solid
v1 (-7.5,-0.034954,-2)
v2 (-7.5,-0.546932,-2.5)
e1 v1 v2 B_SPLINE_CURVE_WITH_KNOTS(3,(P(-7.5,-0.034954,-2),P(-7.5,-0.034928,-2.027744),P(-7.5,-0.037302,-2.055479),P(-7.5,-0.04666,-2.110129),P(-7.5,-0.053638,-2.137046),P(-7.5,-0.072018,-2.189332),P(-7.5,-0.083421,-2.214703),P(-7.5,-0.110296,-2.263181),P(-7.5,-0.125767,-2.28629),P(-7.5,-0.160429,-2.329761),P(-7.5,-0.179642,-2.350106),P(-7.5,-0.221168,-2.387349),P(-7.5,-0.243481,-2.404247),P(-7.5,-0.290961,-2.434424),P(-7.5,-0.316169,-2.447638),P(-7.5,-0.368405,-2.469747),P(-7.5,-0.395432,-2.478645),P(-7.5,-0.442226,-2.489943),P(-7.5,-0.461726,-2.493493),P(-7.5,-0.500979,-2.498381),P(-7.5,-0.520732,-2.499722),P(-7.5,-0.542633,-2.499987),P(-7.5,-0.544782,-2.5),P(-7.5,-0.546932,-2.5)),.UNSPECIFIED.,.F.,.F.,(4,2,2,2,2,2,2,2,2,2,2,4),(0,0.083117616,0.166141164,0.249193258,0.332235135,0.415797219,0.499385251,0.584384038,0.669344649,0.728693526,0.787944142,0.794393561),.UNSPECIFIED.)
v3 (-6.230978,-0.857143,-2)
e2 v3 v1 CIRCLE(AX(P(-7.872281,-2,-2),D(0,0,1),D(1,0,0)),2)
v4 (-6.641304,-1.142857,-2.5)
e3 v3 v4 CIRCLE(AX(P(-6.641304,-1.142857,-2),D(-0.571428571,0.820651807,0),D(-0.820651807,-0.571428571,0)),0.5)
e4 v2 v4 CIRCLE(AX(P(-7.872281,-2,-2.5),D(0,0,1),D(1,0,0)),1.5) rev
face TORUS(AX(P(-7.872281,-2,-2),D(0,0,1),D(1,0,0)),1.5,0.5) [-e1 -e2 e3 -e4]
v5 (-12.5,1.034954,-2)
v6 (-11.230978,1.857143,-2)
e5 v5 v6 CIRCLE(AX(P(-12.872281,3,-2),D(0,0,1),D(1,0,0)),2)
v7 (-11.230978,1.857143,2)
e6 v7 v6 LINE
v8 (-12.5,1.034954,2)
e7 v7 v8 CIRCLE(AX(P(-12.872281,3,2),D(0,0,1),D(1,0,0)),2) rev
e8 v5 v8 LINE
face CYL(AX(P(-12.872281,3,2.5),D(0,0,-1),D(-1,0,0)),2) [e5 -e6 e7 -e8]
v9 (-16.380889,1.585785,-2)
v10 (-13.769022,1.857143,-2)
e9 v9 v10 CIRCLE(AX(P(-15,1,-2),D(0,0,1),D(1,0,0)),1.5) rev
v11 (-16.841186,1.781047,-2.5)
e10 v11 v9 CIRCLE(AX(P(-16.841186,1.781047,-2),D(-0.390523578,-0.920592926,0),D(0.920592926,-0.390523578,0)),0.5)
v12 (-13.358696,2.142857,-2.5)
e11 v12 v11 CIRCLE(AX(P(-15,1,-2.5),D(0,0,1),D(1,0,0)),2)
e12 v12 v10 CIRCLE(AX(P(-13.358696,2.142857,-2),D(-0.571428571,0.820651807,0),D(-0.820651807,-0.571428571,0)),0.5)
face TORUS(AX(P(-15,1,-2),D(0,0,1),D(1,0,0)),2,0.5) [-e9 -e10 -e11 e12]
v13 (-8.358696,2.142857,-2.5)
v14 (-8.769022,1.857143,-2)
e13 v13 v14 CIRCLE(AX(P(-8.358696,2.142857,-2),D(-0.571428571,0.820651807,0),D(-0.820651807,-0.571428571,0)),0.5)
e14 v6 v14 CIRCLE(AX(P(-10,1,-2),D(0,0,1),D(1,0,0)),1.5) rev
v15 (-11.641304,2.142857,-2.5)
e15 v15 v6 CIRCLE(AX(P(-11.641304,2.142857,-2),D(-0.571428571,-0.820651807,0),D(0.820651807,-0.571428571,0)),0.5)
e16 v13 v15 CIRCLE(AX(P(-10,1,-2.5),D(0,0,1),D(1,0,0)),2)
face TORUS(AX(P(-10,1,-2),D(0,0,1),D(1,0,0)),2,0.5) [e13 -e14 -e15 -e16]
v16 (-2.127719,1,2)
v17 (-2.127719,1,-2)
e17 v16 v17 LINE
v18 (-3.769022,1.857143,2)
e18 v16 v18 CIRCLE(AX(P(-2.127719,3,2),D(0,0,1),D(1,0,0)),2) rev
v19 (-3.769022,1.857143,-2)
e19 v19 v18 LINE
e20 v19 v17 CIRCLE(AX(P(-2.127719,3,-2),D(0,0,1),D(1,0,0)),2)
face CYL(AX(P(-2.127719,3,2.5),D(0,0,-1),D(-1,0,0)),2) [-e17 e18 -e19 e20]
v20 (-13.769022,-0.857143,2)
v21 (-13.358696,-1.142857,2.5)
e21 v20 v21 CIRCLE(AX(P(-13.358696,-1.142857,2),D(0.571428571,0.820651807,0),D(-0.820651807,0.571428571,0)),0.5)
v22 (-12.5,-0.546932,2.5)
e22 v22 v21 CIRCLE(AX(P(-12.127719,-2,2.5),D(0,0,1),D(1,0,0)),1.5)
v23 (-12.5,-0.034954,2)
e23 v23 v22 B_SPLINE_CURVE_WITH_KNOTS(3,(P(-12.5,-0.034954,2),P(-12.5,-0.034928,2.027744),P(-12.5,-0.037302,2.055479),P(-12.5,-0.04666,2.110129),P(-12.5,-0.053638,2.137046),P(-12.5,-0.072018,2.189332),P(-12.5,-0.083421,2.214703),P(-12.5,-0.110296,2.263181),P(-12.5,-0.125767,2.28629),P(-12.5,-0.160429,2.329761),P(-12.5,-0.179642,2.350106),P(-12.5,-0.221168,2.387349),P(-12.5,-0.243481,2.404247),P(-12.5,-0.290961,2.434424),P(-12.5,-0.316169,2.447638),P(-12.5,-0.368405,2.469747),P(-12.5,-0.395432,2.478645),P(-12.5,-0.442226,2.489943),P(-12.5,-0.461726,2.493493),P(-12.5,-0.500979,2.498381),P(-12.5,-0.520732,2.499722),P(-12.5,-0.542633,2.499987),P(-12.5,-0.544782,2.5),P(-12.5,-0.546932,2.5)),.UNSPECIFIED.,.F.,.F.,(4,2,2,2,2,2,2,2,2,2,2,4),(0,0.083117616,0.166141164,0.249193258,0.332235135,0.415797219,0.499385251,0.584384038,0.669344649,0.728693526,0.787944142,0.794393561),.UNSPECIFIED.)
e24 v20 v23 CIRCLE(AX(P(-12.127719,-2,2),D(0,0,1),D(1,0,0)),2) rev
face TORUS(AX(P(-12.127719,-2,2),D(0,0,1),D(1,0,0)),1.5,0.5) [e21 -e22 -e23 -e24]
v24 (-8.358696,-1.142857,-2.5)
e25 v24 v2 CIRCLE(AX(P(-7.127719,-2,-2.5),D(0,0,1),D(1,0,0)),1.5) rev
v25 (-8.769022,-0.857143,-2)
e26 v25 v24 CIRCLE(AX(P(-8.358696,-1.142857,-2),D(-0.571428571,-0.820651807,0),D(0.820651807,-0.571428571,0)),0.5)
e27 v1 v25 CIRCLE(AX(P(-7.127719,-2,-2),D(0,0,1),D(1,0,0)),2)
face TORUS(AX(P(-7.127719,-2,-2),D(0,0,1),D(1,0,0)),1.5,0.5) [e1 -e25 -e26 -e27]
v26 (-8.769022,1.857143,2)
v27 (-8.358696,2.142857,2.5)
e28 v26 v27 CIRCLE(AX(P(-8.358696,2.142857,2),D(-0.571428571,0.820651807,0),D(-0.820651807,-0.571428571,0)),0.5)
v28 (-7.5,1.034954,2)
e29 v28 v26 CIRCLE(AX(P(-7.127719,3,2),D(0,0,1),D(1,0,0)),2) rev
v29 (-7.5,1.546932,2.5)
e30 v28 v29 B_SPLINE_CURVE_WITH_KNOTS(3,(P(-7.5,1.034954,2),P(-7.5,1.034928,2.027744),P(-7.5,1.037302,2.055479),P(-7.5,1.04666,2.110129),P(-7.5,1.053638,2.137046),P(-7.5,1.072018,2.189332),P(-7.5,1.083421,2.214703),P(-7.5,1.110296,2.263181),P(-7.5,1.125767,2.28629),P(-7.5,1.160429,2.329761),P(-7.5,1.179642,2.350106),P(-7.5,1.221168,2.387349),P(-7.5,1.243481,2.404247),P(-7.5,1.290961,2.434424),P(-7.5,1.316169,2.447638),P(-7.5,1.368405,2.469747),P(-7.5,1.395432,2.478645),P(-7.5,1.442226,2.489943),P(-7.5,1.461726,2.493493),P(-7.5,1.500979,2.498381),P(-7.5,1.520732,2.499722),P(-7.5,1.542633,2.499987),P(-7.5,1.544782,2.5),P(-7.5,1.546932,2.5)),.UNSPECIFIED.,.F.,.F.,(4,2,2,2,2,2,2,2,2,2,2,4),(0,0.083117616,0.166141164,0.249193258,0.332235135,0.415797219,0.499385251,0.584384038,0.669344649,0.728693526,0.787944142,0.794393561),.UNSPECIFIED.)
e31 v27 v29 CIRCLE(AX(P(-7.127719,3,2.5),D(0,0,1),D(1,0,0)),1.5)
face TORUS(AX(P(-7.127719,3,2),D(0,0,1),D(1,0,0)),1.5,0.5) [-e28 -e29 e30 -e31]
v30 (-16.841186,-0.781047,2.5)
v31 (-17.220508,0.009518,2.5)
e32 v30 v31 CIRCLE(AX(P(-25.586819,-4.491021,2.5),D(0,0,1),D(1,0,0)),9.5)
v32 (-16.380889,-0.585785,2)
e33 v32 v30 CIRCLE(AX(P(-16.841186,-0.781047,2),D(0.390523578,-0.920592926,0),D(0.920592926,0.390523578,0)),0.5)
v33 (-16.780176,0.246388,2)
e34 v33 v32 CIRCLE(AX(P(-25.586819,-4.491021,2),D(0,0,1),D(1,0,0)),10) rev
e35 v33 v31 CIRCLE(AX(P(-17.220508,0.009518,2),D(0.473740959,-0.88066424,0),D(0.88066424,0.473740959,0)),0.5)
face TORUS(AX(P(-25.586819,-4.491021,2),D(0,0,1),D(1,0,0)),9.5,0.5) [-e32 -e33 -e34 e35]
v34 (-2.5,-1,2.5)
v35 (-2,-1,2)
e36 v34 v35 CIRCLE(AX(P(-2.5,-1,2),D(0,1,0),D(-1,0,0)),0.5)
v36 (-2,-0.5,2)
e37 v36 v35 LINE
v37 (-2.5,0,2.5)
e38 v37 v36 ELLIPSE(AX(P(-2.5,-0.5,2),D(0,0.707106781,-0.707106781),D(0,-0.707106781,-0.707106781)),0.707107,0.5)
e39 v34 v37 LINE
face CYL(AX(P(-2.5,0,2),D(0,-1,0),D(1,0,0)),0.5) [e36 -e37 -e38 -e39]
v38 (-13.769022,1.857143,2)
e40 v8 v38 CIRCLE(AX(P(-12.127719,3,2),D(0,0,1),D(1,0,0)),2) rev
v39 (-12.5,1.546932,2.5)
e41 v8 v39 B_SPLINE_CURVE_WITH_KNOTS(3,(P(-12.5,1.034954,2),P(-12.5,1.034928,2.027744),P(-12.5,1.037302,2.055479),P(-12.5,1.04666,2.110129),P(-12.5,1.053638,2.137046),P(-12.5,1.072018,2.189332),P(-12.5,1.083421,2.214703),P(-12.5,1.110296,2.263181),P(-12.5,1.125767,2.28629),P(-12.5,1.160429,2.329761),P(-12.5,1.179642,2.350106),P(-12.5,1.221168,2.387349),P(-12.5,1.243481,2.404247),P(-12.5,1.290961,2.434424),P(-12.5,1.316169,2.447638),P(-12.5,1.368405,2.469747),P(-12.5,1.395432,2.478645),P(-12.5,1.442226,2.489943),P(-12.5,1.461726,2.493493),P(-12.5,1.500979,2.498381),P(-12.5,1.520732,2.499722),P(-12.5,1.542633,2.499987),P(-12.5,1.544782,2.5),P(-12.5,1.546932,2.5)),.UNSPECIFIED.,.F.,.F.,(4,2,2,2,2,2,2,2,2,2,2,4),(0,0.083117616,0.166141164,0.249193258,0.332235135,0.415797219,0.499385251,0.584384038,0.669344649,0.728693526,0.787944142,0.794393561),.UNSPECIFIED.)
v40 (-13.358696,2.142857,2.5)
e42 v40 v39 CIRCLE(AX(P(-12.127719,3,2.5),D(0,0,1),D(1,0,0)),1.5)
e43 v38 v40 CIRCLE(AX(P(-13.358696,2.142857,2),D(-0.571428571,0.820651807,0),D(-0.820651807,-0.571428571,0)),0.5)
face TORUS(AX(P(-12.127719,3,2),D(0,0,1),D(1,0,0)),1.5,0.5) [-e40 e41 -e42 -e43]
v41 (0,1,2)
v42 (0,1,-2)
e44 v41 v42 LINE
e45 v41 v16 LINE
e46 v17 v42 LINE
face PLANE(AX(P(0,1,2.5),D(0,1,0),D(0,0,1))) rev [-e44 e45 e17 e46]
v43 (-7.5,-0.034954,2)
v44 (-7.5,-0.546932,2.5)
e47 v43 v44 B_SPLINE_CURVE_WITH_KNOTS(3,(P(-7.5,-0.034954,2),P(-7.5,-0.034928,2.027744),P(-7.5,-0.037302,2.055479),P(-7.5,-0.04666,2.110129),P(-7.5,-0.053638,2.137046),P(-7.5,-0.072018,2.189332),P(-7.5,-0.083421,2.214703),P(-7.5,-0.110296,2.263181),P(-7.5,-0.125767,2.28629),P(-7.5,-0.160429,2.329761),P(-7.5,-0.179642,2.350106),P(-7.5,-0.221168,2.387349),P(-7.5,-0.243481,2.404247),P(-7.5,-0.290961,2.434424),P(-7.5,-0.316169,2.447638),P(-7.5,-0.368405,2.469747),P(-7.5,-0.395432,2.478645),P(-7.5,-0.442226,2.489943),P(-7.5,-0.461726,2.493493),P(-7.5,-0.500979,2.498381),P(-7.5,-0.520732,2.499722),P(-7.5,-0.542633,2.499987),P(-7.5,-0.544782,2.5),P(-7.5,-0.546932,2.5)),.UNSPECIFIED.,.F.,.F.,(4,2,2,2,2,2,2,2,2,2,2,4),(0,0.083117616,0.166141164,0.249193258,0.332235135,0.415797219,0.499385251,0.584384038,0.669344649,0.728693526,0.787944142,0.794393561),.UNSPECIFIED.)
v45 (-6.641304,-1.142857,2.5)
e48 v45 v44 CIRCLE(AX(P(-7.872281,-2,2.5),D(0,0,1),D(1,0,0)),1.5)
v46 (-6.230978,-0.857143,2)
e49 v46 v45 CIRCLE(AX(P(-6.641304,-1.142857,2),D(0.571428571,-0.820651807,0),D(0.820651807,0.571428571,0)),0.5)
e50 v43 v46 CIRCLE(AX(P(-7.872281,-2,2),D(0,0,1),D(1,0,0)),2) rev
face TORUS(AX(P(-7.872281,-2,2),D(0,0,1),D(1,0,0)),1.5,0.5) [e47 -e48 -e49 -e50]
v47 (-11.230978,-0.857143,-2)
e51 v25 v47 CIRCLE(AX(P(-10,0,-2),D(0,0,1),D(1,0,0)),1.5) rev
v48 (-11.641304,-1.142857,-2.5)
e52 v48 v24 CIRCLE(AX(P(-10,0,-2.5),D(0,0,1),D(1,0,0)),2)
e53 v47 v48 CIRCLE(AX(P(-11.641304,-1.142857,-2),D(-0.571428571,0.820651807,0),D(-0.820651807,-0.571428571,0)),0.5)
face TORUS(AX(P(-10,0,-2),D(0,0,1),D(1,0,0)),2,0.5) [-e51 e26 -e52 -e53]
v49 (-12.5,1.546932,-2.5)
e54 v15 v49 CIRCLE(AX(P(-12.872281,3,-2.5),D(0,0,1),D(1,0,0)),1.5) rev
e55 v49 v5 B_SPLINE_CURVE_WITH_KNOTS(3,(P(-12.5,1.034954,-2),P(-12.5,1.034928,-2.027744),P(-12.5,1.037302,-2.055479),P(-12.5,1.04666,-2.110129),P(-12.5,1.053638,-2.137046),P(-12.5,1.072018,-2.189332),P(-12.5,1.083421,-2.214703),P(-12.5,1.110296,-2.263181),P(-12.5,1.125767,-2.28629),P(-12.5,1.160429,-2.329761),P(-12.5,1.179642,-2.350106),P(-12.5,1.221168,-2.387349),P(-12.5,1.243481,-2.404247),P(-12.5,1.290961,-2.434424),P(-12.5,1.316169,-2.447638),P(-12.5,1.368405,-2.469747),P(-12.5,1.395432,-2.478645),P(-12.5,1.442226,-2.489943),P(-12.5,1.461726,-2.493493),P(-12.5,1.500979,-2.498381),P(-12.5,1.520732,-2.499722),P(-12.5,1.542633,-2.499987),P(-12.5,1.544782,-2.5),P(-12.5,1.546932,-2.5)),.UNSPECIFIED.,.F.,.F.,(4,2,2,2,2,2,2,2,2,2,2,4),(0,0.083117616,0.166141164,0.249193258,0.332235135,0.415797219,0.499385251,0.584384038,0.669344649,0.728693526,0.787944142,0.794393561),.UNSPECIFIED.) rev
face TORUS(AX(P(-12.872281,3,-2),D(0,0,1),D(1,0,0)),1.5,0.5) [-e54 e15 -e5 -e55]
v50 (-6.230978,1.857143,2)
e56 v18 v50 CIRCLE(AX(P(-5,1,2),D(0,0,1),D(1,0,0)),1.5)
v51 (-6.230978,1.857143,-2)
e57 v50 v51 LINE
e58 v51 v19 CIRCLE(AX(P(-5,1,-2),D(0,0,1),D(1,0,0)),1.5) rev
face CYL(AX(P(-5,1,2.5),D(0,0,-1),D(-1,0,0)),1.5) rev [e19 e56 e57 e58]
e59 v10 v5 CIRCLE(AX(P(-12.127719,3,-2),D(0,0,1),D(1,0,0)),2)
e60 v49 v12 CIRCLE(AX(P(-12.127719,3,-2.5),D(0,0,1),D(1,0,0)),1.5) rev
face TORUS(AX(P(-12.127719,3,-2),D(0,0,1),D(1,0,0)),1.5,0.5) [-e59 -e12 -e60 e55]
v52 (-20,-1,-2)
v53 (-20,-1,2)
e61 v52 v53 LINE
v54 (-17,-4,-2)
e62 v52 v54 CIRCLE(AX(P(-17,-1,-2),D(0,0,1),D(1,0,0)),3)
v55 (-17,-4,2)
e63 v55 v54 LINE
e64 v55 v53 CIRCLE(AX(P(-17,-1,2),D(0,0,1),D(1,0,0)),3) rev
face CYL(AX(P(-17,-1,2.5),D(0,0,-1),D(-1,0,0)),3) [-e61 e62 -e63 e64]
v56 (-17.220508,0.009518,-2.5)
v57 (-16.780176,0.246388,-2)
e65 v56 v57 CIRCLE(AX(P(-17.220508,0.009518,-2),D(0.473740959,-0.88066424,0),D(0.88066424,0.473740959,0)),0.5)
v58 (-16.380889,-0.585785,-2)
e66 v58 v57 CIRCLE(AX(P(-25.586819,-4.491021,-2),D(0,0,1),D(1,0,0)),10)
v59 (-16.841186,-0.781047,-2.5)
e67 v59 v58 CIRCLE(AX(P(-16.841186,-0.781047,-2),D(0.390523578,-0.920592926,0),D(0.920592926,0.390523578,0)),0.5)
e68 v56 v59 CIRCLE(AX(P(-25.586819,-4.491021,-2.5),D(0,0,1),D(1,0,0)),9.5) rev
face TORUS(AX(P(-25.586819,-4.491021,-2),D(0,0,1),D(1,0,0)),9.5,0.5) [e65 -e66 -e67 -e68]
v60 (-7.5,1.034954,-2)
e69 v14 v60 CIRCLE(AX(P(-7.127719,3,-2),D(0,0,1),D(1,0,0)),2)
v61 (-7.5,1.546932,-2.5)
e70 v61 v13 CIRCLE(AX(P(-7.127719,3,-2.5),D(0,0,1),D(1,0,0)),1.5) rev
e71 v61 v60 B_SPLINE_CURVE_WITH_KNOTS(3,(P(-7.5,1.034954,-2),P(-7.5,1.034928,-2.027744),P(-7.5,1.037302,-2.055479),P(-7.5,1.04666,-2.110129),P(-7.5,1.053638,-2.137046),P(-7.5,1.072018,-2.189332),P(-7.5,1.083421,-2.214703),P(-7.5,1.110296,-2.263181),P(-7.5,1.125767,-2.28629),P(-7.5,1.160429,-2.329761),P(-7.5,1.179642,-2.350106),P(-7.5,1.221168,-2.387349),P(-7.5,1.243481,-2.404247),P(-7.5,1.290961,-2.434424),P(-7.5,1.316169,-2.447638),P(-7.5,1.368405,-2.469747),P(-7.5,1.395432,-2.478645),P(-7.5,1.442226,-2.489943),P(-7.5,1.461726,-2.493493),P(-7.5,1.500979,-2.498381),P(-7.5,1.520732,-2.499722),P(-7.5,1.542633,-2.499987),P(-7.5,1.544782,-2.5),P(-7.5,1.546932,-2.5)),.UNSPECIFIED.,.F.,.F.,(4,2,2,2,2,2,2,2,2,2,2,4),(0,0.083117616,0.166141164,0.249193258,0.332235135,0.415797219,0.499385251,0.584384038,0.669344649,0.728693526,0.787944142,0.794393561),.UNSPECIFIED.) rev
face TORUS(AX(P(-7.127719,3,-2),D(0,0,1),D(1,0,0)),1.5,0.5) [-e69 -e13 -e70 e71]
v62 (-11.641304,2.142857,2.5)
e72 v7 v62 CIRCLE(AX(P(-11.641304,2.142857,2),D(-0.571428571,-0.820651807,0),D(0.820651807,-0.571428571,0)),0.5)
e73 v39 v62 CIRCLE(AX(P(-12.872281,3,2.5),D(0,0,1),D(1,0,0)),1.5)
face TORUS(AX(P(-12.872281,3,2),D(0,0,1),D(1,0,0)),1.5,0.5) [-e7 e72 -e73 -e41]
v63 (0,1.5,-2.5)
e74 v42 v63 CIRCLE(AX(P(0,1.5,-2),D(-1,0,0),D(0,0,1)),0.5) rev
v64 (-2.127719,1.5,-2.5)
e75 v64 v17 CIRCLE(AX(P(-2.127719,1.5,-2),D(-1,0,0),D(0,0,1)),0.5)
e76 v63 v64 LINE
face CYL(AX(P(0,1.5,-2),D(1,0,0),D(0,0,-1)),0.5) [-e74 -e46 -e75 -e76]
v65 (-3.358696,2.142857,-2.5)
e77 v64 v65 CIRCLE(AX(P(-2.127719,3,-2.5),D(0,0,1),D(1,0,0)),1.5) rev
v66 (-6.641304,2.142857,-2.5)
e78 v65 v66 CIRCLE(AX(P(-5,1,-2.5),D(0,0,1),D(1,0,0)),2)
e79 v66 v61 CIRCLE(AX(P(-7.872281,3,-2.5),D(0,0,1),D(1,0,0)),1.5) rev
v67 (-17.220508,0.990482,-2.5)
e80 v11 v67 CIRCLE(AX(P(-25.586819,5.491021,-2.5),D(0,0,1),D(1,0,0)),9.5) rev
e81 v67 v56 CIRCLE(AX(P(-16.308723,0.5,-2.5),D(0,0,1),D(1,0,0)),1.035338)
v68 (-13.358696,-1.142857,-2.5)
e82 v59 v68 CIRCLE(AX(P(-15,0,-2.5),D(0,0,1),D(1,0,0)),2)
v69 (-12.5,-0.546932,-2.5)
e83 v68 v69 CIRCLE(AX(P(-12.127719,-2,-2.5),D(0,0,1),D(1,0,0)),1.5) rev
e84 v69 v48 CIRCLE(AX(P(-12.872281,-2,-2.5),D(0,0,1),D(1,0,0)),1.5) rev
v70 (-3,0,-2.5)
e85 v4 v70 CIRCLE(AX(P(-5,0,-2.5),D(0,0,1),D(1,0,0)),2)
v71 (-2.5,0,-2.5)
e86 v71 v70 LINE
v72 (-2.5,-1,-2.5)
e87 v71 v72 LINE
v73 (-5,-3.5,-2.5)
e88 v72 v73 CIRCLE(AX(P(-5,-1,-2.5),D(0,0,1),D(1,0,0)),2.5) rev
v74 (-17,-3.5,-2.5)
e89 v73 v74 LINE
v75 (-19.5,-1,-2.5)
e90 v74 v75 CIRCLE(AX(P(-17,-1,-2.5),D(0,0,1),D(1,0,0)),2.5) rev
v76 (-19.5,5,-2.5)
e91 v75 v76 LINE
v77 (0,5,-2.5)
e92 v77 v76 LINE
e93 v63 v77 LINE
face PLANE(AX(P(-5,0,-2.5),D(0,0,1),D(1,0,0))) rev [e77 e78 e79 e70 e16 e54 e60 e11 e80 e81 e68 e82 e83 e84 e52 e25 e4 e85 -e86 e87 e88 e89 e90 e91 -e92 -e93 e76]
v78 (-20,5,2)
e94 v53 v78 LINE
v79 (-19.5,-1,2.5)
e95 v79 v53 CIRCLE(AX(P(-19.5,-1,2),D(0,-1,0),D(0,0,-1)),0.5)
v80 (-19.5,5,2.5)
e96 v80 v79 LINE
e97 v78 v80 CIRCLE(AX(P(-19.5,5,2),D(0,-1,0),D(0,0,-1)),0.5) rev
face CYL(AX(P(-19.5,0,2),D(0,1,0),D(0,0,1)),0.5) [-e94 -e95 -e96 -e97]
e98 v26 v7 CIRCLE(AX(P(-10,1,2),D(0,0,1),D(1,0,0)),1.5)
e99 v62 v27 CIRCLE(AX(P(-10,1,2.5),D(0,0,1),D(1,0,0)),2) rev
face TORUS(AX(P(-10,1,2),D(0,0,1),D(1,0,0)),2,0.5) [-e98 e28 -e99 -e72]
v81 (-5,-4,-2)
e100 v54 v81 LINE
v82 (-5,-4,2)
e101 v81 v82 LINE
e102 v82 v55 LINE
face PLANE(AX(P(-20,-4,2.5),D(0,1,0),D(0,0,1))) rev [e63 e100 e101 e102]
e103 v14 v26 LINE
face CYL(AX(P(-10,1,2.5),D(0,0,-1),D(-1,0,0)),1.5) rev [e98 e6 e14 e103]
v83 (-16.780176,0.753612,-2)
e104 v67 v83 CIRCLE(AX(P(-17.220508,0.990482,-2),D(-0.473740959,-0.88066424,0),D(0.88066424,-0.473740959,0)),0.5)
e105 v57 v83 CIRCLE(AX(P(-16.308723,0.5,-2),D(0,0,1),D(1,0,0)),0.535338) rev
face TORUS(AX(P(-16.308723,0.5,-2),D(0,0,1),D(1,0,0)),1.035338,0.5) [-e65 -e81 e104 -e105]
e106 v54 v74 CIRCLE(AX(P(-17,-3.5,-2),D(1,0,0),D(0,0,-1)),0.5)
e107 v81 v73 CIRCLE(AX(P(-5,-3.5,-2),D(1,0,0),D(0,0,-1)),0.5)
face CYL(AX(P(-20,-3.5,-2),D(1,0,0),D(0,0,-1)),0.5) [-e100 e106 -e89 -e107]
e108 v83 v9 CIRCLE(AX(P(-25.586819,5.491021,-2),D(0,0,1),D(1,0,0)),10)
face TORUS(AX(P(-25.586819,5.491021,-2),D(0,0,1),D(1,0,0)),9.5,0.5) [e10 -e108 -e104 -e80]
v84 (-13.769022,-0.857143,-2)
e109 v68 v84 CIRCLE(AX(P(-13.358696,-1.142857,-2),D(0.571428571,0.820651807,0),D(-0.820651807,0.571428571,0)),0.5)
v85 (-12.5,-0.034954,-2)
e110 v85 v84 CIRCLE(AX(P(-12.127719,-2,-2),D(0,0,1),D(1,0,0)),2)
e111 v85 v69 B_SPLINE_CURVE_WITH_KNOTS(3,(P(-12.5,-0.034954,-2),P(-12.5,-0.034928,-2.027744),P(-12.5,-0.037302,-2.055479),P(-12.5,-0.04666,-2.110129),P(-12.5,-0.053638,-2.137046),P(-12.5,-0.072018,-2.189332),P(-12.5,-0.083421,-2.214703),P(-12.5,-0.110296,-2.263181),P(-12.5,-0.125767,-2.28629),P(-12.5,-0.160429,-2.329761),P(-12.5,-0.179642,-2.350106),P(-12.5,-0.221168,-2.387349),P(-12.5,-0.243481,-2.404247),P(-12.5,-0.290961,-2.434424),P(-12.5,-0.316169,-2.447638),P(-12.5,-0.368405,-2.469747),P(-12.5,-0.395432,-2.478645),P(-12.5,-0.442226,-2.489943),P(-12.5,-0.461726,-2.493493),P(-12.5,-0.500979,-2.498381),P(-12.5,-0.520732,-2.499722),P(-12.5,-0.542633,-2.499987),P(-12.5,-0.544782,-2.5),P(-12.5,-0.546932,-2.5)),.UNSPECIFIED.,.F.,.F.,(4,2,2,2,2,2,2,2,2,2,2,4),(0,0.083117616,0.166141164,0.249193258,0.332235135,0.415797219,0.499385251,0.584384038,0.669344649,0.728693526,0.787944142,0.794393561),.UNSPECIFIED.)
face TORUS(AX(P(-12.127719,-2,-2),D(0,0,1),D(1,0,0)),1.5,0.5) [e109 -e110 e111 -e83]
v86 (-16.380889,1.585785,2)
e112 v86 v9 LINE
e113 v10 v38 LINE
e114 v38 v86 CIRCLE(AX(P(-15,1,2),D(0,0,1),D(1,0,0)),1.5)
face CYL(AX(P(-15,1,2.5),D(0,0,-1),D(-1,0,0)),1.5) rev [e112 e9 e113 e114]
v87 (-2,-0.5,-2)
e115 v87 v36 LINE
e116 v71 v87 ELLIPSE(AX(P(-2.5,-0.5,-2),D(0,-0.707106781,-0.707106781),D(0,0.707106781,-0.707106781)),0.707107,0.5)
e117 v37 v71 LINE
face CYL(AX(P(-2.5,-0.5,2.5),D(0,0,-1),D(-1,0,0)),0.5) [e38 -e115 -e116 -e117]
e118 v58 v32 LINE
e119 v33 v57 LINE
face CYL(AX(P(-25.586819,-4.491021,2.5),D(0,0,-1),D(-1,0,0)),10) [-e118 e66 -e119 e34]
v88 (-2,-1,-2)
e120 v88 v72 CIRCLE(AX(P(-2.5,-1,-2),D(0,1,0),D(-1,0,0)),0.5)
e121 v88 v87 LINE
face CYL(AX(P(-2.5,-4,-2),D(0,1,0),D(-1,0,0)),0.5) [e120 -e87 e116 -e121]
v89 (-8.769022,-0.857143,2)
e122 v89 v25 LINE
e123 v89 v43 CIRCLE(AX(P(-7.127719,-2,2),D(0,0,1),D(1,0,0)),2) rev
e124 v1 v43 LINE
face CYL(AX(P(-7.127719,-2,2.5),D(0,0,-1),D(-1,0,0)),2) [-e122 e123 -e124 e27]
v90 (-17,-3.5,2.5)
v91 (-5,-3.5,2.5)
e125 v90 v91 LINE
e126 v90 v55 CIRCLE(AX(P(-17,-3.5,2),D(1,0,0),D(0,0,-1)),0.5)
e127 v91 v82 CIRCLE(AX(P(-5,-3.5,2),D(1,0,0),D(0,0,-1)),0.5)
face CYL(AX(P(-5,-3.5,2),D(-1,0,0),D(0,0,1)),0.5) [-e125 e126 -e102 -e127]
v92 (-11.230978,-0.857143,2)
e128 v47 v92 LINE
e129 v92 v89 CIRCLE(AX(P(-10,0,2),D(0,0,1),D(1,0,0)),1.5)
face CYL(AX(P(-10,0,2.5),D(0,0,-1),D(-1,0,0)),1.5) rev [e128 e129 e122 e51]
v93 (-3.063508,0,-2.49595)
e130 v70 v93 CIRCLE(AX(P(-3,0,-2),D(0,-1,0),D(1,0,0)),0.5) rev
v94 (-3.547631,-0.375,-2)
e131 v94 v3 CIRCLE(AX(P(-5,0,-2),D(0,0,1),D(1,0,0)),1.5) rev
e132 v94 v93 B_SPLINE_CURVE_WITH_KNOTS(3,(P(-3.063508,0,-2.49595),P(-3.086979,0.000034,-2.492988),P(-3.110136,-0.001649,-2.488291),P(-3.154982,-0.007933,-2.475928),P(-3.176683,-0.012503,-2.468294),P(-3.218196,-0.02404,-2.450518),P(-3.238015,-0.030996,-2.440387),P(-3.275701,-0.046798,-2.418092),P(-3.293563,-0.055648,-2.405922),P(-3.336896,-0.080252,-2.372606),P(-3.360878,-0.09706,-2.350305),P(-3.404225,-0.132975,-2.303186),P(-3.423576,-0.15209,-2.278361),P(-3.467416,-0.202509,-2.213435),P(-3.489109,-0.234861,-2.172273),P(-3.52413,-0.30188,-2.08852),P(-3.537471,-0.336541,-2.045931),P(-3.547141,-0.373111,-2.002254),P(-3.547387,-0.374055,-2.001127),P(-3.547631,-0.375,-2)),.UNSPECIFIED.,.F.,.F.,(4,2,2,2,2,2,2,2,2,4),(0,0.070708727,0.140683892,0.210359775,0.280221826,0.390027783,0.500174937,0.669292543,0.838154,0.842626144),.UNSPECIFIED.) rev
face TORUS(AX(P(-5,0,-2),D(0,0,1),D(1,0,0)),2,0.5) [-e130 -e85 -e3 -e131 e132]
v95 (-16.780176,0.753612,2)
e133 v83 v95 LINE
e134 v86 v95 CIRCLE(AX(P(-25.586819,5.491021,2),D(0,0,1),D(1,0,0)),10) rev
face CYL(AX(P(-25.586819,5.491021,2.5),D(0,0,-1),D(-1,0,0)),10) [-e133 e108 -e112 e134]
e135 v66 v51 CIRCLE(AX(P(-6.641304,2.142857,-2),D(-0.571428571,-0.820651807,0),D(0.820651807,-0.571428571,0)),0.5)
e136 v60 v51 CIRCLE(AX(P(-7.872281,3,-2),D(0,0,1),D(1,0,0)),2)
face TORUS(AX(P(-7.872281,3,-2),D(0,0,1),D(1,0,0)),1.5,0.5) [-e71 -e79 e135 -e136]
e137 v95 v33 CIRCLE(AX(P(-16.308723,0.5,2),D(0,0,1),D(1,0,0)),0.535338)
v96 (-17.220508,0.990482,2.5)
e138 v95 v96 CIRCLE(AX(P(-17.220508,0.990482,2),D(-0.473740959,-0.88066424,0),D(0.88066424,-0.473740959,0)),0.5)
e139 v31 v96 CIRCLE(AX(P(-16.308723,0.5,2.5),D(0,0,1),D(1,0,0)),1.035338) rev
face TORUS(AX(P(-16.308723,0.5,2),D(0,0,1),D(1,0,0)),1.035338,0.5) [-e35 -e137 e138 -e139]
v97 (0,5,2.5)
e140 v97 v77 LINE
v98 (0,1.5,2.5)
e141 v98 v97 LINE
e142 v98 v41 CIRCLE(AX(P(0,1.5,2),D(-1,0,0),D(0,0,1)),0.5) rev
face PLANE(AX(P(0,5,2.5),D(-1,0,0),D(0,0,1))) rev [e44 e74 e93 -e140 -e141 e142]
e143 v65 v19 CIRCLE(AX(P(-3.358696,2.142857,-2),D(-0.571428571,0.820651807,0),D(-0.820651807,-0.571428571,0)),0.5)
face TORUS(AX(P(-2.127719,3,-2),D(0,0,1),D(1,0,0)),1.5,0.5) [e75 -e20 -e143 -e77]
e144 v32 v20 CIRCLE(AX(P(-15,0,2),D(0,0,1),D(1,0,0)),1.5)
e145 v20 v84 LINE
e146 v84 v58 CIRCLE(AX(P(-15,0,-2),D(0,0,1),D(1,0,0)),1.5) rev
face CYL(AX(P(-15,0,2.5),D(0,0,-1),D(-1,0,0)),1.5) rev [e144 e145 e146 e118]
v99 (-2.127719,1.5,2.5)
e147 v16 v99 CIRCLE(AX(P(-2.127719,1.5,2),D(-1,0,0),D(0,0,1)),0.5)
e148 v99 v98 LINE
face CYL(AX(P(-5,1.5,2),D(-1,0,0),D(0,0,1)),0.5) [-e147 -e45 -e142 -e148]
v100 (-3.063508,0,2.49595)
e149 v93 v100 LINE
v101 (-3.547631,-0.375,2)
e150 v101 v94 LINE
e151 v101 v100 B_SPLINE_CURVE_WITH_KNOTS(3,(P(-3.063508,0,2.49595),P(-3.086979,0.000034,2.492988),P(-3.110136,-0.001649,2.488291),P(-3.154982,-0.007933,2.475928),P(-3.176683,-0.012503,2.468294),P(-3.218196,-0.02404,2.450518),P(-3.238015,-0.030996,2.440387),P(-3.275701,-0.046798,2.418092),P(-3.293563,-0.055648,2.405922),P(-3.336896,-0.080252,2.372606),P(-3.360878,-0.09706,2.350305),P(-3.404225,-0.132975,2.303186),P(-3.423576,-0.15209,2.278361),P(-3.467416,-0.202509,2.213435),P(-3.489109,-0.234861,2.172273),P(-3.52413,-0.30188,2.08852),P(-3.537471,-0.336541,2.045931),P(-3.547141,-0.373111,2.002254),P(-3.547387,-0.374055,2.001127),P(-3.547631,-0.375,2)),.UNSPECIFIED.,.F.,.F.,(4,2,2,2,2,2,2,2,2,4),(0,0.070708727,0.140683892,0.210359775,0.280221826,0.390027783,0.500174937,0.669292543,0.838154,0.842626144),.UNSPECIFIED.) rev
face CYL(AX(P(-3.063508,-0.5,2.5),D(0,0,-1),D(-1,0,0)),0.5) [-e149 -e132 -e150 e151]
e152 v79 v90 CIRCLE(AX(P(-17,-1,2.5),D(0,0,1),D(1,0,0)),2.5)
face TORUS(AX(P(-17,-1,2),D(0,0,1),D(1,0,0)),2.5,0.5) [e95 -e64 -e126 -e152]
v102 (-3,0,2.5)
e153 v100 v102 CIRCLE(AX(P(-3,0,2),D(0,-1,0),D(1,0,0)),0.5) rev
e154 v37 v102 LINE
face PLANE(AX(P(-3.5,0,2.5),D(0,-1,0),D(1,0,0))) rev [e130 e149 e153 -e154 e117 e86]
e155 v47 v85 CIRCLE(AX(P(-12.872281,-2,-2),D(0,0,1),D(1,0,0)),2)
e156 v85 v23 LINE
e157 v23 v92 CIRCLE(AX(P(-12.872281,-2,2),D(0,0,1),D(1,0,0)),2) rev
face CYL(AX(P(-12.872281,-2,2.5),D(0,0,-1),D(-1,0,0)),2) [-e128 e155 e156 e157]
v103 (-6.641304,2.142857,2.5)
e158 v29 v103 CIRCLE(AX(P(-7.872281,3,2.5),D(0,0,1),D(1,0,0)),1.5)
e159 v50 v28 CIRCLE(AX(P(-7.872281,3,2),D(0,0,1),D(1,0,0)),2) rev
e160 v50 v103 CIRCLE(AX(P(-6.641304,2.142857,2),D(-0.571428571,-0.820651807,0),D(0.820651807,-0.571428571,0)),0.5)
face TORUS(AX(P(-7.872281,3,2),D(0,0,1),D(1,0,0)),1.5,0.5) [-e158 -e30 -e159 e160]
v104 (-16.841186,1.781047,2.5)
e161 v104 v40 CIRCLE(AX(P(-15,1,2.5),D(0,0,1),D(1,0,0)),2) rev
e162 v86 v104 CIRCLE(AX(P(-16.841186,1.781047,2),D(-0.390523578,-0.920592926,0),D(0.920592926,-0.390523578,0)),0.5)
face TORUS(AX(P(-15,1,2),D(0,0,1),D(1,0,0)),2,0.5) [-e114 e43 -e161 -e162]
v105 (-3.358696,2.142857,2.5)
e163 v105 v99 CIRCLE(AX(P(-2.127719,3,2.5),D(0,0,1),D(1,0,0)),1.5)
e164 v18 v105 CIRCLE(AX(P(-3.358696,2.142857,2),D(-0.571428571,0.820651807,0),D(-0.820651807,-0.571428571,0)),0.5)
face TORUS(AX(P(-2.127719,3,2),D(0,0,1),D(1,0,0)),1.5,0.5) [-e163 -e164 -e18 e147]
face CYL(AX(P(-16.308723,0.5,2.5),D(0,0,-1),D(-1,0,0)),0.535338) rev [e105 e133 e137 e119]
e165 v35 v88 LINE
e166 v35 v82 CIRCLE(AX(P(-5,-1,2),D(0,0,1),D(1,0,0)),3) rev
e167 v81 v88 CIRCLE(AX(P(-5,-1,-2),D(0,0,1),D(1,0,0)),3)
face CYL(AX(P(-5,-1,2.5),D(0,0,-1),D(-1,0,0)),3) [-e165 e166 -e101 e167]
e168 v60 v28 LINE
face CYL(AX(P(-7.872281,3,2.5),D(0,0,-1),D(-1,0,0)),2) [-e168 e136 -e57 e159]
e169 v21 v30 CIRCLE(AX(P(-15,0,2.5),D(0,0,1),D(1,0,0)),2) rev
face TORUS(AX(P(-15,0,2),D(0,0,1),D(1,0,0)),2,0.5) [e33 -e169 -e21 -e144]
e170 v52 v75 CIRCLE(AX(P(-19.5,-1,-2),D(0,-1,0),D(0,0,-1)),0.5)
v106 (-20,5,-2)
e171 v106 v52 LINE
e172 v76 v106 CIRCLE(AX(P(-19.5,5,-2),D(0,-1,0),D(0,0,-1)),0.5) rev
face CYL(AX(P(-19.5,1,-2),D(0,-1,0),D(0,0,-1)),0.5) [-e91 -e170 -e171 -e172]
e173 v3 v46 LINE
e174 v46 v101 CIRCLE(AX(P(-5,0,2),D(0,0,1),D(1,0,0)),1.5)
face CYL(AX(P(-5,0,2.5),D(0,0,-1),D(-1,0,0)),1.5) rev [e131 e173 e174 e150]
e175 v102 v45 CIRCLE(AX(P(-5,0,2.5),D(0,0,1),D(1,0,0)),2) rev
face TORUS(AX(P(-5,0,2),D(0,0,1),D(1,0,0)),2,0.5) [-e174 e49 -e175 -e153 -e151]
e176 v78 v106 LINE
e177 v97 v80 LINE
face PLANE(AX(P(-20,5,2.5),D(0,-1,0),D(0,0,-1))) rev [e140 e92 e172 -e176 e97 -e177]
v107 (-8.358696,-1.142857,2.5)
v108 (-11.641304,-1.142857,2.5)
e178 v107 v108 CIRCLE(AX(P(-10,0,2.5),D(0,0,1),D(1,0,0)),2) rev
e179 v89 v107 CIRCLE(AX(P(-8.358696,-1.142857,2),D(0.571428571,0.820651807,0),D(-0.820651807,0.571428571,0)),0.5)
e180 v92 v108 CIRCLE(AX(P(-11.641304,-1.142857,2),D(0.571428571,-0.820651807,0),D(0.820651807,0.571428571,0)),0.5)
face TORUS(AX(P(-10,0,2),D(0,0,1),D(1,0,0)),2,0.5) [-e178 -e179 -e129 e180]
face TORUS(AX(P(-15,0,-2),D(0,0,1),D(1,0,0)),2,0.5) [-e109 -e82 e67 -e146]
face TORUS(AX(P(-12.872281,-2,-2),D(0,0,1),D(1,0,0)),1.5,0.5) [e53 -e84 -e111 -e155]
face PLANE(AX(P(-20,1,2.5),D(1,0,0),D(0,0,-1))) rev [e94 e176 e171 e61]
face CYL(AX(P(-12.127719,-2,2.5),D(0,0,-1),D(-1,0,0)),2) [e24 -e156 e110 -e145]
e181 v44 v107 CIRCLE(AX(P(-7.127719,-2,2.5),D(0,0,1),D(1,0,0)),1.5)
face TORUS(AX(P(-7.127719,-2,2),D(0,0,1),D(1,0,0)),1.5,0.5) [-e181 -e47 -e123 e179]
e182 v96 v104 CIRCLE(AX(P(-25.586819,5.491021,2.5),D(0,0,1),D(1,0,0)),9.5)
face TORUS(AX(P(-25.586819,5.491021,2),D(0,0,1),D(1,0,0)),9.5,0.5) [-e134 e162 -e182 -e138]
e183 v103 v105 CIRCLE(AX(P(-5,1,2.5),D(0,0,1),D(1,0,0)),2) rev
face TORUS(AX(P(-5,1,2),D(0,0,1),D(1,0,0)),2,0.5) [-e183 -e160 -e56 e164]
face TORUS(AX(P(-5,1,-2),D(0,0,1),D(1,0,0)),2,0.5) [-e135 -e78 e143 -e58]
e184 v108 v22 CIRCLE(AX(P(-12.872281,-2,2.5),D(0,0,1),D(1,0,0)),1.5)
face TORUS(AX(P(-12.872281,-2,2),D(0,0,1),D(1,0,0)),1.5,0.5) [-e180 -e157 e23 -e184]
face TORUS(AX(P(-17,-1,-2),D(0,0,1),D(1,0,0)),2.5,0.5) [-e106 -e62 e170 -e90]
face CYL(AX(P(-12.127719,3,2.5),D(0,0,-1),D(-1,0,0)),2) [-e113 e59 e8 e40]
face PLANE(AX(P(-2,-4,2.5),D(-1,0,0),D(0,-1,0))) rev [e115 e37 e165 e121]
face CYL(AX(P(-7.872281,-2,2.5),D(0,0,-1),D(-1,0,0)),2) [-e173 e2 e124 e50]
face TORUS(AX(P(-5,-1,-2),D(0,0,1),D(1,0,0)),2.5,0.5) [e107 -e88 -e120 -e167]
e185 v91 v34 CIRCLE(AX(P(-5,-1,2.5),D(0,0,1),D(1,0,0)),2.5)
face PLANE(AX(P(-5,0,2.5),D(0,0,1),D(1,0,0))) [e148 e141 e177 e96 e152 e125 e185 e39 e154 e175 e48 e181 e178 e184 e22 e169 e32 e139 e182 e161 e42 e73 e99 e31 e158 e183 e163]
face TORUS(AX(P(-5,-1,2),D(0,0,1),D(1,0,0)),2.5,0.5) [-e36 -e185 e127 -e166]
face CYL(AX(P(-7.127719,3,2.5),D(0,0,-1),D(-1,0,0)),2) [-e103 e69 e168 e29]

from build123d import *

# Parameters (mm, degrees)
BOSS_EXTRUDE1_DEPTH = 2.5
FILLET1_R           = 10
FILLET2_R           = 2
FILLET3_R           = 3
FILLET4_R           = 0.5


with BuildPart() as part:
    # Sketch3 → Boss-Extrude1 (new, symmetric)
    with BuildSketch(Plane.XY):
        with BuildLine():
            Line((-20, 0), (-20, -4))
            Line((-20, -4), (-2, -4))
            Line((-2, -4), (-2, 0))
            Line((-2, 0), (-3.5, 0))
            ThreePointArc((-3.5, 0), (-5, -1.5), (-6.5, 0))
            Line((-6.5, 0), (-8.5, 0))
            ThreePointArc((-8.5, 0), (-10, -1.5), (-11.5, 0))
            Line((-11.5, 0), (-13.5, 0))
            ThreePointArc((-13.5, 0), (-15, -1.5), (-16.5, 0))
            ThreePointArc((-16.5, 0), (-16.844061217, 0.5), (-16.5, 1))
            ThreePointArc((-16.5, 1), (-15, 2.5), (-13.5, 1))
            Line((-13.5, 1), (-11.5, 1))
            ThreePointArc((-11.5, 1), (-10, 2.5), (-8.5, 1))
            Line((-8.5, 1), (-6.5, 1))
            ThreePointArc((-6.5, 1), (-5, 2.5), (-3.5, 1))
            Line((-3.5, 1), (-2, 1))
            Line((-2, 1), (0, 1))
            Line((0, 1), (0, 5))
            Line((0, 5), (-2, 5))
            Line((-2, 5), (-20, 5))
            Line((-20, 5), (-20, 1))
            Line((-20, 1), (-20, 0))
        make_face()
    extrude(amount=BOSS_EXTRUDE1_DEPTH, both=True)

    # Fillet1
    fillet1_edges = [part.edges().sort_by_distance(p)[0] for p in [
        (-16.5, 1, 0),
        (-16.5, 0, 0),
    ]]
    fillet(fillet1_edges, radius=FILLET1_R)

    # Fillet2
    # the kernel refuses this fillet: 2 mm, written as the material it takes off along each edge
    with BuildSketch(Plane(origin=(-13.5, 1, -5.930703308), x_dir=(-0.29945633517394393, 0.9541100058820212, 0), z_dir=(0, 0, 1))) as fillet2_piece_1:
        with BuildLine():
            CenterArc((1.497281676, -1.908220012), FILLET2_R, 107.42495229, 55.150095421)
            Line((-0.410938336, -1.309307341), (0, 0))
            ThreePointArc((0, 0), (0.449184503, -0.068834991), (0.898369006, 0))
        make_face()
    extrude(amount=11.861406616, mode=Mode.SUBTRACT)
    with BuildSketch(Plane(origin=(-11.5, 1, -5.930703308), x_dir=(-1, 0, 0), z_dir=(0, 0, 1))) as fillet2_piece_2:
        with BuildLine():
            CenterArc((1.372281323, -2), FILLET2_R, 90, 55.150095421)
            ThreePointArc((-0.26902229, -0.857142857), (-0.068834991, -0.449184503), (0, 0))
            Line((0, 0), (1.372281323, 0))
        make_face()
    extrude(amount=11.861406616, mode=Mode.SUBTRACT)
    with BuildSketch(Plane(origin=(-8.5, 1, 5.930703308), x_dir=(-0.29945633517396103, 0.9541100058820159, 0), z_dir=(0, 0, -1)), Plane(origin=(-3.5, 1, 5.930703308), x_dir=(-0.2994563351739779, 0.9541100058820106, 0), z_dir=(0, 0, -1)), Plane(origin=(-8.5, 0, -5.930703308), x_dir=(-0.29945633517396103, -0.9541100058820159, 0), z_dir=(0, 0, 1)), Plane(origin=(-13.5, 0, -5.930703308), x_dir=(-0.2994563351739456, -0.9541100058820208, 0), z_dir=(0, 0, 1))) as fillet2_piece_3:
        with BuildLine():
            CenterArc((1.497281676, 1.908220012), FILLET2_R, 197.42495229, 55.150095421)
            Line((-0.410938336, 1.309307341), (0, 0))
            ThreePointArc((0, 0), (0.449184503, 0.068834991), (0.898369006, 0))
        make_face()
    extrude(amount=11.861406616, mode=Mode.SUBTRACT)
    with BuildSketch(Plane(origin=(-6.5, 1, 5.930703308), x_dir=(-1, 0, 0), z_dir=(0, 0, -1)), Plane(origin=(-6.5, 0, -5.930703308), x_dir=(-1, 0, 0), z_dir=(0, 0, 1)), Plane(origin=(-11.5, 0, -5.930703308), x_dir=(-1, 0, 0), z_dir=(0, 0, 1))) as fillet2_piece_4:
        with BuildLine():
            CenterArc((1.372281323, 2), FILLET2_R, 214.849904579, 55.150095421)
            ThreePointArc((-0.26902229, 0.857142857), (-0.068834991, 0.449184503), (0, 0))
            Line((0, 0), (1.372281323, 0))
        make_face()
    extrude(amount=11.861406616, mode=Mode.SUBTRACT)

    # Fillet3
    fillet3_edges = [part.edges().sort_by_distance(p)[0] for p in [
        (-2, -4, 0),
        (-20, -4, 0),
    ]]
    fillet(fillet3_edges, radius=FILLET3_R)

    # Fillet4
    fillet4_edges = [part.edges().sort_by_distance(p)[0] for p in [
        (-2, -0.5, -2.5),
        (-2, -0.5, 2.5),
        (-11, -4, -2.5),
        (-19.121320344, -3.121320344, -2.5),
        (-2.878679656, -3.121320344, -2.5),
        (-11, -4, 2.5),
        (-19.121320344, -3.121320344, 2.5),
        (-2.878679656, -3.121320344, 2.5),
        (-20, 2, -2.5),
        (-4.550815497, -1.431165009, 2.5),
        (-4.550815497, -1.431165009, -2.5),
        (-3.5, 0, 0),
        (-2, 0, 0),
        (-20, 2, 2.5),
        (-15.155006773, 2.49196947, -2.5),
        (-15.155006773, 2.49196947, 2.5),
        (-16.844061217, 0.5, -2.5),
        (-16.570926413, -0.165089198, -2.5),
        (-16.570926413, 1.165089198, -2.5),
        (-16.844061217, 0.5, 2.5),
        (-16.570926413, -0.165089198, 2.5),
        (-16.570926413, 1.165089198, 2.5),
        (-15.155006773, -1.49196947, -2.5),
        (-10, -1.5, -2.5),
        (-1.063859338, 1, -2.5),
        (-5, 2.5, -2.5),
        (-10, 2.5, -2.5),
        (-13.215206511, -0.321497629, -2.5),
        (-11.784793489, -0.321497629, -2.5),
        (-8.215206511, -0.321497629, -2.5),
        (-6.784793489, -0.321497629, -2.5),
        (-3.053538777, 1.227189479, -2.5),
        (-6.784793489, 1.321497629, -2.5),
        (-8.215206511, 1.321497629, -2.5),
        (-11.784793489, 1.321497629, -2.5),
        (-13.215206511, 1.321497629, -2.5),
        (-10, 2.5, 2.5),
        (-5, 2.5, 2.5),
        (-1.063859338, 1, 2.5),
        (-10, -1.5, 2.5),
        (-15.155006773, -1.49196947, 2.5),
        (-13.215206511, -0.321497629, 2.5),
        (-11.784793489, -0.321497629, 2.5),
        (-8.215206511, -0.321497629, 2.5),
        (-6.784793489, -0.321497629, 2.5),
        (-3.053538777, 1.227189479, 2.5),
        (-6.784793489, 1.321497629, 2.5),
        (-8.215206511, 1.321497629, 2.5),
        (-11.784793489, 1.321497629, 2.5),
        (-13.215206511, 1.321497629, 2.5),
    ]]
    fillet(fillet4_edges, radius=FILLET4_R)


solid = part.part
